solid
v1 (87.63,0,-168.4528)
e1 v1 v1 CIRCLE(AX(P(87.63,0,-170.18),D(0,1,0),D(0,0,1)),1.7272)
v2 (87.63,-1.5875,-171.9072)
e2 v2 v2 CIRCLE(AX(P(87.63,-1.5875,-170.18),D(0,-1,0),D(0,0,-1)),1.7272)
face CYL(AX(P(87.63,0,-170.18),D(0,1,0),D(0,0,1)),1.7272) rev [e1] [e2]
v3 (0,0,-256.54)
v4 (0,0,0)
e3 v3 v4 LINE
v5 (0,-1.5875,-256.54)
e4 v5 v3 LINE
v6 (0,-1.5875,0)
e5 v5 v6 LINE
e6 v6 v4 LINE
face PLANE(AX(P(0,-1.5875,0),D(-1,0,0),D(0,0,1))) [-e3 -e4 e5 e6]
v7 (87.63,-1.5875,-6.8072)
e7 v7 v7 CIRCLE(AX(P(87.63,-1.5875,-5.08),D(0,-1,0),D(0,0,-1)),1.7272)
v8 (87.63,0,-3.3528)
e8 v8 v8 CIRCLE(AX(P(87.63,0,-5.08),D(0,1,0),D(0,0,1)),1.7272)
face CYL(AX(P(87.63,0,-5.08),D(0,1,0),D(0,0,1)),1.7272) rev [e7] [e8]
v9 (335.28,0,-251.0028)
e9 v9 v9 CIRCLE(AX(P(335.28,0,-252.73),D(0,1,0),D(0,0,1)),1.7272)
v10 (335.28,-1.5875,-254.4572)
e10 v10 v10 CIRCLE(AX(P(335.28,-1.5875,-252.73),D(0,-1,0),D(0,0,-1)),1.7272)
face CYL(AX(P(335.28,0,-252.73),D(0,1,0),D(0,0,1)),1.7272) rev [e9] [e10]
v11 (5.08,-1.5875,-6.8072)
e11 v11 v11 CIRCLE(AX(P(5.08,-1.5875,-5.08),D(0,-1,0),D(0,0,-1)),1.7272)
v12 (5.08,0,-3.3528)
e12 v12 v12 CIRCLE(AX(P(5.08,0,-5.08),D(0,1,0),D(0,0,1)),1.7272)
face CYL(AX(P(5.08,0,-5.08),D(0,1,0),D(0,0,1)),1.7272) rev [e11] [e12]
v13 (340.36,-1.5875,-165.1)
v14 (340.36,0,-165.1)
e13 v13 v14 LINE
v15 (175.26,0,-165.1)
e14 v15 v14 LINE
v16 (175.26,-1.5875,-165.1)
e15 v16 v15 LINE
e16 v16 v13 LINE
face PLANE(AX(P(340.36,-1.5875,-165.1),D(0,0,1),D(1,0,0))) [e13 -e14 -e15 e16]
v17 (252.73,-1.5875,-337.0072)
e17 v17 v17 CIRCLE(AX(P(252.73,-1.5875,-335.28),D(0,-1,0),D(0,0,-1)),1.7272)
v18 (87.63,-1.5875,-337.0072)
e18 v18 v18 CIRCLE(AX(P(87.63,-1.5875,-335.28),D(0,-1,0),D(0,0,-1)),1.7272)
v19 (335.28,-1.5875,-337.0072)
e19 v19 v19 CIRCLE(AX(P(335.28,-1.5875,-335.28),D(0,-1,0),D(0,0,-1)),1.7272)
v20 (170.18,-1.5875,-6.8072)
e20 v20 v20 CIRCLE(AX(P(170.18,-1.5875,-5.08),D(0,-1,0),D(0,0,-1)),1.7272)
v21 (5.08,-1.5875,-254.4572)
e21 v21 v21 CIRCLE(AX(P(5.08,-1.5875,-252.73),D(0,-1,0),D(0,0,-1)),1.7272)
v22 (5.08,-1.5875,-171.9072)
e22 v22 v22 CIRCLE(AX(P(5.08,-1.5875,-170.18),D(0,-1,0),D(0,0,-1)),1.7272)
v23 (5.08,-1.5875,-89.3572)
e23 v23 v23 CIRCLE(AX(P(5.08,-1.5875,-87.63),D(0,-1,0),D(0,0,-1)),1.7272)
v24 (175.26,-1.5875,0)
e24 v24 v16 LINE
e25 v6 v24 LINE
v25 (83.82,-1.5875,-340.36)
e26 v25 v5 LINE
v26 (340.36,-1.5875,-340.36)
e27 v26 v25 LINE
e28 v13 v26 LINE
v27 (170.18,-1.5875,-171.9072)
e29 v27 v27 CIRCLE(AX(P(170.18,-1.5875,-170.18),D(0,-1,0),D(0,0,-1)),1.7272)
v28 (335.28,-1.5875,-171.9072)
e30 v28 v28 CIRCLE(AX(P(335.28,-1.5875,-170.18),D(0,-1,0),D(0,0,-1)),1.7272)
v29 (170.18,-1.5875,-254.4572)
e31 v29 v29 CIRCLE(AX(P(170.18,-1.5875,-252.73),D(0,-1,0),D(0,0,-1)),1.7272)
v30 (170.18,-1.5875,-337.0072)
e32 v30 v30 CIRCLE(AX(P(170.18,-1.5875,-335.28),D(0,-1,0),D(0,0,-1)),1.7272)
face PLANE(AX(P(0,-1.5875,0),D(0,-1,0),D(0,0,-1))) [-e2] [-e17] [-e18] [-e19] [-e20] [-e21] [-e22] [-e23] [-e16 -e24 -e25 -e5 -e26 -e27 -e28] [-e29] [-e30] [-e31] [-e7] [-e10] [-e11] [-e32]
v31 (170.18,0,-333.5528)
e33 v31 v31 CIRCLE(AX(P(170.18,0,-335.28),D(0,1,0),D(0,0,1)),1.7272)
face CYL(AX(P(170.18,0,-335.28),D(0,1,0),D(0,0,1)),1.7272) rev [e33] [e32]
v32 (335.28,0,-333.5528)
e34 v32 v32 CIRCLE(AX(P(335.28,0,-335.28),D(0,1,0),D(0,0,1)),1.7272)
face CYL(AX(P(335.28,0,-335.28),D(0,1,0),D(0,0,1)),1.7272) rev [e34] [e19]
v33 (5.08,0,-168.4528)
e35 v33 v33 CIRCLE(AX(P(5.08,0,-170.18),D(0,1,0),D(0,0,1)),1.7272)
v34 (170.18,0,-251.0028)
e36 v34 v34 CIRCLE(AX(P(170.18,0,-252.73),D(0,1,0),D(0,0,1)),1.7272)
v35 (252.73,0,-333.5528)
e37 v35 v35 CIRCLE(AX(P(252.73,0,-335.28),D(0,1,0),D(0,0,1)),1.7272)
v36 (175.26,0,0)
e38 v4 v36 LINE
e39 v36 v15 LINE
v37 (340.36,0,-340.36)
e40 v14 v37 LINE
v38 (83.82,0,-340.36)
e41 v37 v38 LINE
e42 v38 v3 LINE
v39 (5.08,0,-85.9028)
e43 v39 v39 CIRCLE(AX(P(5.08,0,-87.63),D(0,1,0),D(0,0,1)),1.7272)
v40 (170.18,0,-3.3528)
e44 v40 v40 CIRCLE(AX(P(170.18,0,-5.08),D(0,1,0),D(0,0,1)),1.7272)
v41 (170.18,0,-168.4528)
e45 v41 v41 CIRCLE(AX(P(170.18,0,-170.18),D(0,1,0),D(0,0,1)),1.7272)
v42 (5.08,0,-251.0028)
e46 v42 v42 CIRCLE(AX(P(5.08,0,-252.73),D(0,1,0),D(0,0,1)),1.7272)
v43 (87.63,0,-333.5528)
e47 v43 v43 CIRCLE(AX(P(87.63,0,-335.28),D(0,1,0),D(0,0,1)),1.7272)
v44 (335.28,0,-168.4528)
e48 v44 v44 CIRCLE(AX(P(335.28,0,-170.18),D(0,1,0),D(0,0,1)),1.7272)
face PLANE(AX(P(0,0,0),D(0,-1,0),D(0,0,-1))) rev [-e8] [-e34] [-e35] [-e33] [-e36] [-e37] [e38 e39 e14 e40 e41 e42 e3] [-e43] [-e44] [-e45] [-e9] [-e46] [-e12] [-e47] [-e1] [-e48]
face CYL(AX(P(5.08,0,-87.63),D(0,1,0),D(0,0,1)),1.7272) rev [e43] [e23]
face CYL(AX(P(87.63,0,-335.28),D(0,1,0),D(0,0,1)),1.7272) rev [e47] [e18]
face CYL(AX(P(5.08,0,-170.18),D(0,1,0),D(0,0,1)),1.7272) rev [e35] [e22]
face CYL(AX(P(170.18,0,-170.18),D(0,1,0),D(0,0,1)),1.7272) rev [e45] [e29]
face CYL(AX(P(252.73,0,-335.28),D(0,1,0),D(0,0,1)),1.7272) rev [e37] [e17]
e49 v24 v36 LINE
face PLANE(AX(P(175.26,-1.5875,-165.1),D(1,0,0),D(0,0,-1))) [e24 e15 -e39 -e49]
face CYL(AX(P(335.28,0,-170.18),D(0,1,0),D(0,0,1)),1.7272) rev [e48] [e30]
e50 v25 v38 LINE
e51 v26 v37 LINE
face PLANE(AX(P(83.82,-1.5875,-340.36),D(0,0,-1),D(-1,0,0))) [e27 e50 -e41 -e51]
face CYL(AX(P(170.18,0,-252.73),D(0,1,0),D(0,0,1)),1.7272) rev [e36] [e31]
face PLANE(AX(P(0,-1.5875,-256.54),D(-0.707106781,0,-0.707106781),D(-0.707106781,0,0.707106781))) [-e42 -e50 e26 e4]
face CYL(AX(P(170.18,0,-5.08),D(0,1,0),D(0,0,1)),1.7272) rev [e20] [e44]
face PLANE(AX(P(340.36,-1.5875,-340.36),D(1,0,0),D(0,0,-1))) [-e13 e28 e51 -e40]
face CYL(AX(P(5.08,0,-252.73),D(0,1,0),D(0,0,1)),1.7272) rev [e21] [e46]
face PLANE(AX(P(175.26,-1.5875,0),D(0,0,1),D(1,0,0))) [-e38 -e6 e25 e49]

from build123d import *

# Parameters (mm, degrees)
BASE_FLANGE1_DEPTH              = 1.5875
F_29_0_136_DIAMETER_HOLE1_D     = 3.4544
F_29_0_136_DIAMETER_HOLE1_DEPTH = 6.35
F_29_0_136_DIAMETER_HOLE1_TIP   = 1.037806461


# Sheet-metal steps are written as plain solids
with BuildPart() as part:
    # Sketch1 → Base-Flange1 (new body)
    with BuildSketch(Plane(origin=(0, 0, 0), x_dir=(1, 0, 0), z_dir=(0, 1, 0))):
        Polygon((0, 0), (0, 256.54), (83.82, 340.36), (340.36, 340.36), (340.36, 165.1), (175.26, 165.1), (175.26, 0), align=None)
    extrude(amount=-BASE_FLANGE1_DEPTH)

    # #29 (0.136) Diameter Hole1
    with Locations(Plane(origin=(0, 0, 0), x_dir=(1, 0, 0), z_dir=(0, 1, 0))):
        with Locations((5.08, 5.08), (335.28, 170.18), (87.63, 5.08), (170.18, 5.08), (5.08, 87.63), (5.08, 170.18), (5.08, 252.73), (335.28, 252.73), (335.28, 335.28), (252.73, 335.28), (170.18, 335.28), (87.63, 335.28), (170.18, 170.18), (87.63, 170.18), (170.18, 252.73)):
            Hole(F_29_0_136_DIAMETER_HOLE1_D / 2, depth=F_29_0_136_DIAMETER_HOLE1_DEPTH)
            with Locations((0, 0, -(F_29_0_136_DIAMETER_HOLE1_DEPTH + F_29_0_136_DIAMETER_HOLE1_TIP / 2))):  # 118° drill point
                Cone(0, F_29_0_136_DIAMETER_HOLE1_D / 2, F_29_0_136_DIAMETER_HOLE1_TIP, mode=Mode.SUBTRACT)


solid = part.part
